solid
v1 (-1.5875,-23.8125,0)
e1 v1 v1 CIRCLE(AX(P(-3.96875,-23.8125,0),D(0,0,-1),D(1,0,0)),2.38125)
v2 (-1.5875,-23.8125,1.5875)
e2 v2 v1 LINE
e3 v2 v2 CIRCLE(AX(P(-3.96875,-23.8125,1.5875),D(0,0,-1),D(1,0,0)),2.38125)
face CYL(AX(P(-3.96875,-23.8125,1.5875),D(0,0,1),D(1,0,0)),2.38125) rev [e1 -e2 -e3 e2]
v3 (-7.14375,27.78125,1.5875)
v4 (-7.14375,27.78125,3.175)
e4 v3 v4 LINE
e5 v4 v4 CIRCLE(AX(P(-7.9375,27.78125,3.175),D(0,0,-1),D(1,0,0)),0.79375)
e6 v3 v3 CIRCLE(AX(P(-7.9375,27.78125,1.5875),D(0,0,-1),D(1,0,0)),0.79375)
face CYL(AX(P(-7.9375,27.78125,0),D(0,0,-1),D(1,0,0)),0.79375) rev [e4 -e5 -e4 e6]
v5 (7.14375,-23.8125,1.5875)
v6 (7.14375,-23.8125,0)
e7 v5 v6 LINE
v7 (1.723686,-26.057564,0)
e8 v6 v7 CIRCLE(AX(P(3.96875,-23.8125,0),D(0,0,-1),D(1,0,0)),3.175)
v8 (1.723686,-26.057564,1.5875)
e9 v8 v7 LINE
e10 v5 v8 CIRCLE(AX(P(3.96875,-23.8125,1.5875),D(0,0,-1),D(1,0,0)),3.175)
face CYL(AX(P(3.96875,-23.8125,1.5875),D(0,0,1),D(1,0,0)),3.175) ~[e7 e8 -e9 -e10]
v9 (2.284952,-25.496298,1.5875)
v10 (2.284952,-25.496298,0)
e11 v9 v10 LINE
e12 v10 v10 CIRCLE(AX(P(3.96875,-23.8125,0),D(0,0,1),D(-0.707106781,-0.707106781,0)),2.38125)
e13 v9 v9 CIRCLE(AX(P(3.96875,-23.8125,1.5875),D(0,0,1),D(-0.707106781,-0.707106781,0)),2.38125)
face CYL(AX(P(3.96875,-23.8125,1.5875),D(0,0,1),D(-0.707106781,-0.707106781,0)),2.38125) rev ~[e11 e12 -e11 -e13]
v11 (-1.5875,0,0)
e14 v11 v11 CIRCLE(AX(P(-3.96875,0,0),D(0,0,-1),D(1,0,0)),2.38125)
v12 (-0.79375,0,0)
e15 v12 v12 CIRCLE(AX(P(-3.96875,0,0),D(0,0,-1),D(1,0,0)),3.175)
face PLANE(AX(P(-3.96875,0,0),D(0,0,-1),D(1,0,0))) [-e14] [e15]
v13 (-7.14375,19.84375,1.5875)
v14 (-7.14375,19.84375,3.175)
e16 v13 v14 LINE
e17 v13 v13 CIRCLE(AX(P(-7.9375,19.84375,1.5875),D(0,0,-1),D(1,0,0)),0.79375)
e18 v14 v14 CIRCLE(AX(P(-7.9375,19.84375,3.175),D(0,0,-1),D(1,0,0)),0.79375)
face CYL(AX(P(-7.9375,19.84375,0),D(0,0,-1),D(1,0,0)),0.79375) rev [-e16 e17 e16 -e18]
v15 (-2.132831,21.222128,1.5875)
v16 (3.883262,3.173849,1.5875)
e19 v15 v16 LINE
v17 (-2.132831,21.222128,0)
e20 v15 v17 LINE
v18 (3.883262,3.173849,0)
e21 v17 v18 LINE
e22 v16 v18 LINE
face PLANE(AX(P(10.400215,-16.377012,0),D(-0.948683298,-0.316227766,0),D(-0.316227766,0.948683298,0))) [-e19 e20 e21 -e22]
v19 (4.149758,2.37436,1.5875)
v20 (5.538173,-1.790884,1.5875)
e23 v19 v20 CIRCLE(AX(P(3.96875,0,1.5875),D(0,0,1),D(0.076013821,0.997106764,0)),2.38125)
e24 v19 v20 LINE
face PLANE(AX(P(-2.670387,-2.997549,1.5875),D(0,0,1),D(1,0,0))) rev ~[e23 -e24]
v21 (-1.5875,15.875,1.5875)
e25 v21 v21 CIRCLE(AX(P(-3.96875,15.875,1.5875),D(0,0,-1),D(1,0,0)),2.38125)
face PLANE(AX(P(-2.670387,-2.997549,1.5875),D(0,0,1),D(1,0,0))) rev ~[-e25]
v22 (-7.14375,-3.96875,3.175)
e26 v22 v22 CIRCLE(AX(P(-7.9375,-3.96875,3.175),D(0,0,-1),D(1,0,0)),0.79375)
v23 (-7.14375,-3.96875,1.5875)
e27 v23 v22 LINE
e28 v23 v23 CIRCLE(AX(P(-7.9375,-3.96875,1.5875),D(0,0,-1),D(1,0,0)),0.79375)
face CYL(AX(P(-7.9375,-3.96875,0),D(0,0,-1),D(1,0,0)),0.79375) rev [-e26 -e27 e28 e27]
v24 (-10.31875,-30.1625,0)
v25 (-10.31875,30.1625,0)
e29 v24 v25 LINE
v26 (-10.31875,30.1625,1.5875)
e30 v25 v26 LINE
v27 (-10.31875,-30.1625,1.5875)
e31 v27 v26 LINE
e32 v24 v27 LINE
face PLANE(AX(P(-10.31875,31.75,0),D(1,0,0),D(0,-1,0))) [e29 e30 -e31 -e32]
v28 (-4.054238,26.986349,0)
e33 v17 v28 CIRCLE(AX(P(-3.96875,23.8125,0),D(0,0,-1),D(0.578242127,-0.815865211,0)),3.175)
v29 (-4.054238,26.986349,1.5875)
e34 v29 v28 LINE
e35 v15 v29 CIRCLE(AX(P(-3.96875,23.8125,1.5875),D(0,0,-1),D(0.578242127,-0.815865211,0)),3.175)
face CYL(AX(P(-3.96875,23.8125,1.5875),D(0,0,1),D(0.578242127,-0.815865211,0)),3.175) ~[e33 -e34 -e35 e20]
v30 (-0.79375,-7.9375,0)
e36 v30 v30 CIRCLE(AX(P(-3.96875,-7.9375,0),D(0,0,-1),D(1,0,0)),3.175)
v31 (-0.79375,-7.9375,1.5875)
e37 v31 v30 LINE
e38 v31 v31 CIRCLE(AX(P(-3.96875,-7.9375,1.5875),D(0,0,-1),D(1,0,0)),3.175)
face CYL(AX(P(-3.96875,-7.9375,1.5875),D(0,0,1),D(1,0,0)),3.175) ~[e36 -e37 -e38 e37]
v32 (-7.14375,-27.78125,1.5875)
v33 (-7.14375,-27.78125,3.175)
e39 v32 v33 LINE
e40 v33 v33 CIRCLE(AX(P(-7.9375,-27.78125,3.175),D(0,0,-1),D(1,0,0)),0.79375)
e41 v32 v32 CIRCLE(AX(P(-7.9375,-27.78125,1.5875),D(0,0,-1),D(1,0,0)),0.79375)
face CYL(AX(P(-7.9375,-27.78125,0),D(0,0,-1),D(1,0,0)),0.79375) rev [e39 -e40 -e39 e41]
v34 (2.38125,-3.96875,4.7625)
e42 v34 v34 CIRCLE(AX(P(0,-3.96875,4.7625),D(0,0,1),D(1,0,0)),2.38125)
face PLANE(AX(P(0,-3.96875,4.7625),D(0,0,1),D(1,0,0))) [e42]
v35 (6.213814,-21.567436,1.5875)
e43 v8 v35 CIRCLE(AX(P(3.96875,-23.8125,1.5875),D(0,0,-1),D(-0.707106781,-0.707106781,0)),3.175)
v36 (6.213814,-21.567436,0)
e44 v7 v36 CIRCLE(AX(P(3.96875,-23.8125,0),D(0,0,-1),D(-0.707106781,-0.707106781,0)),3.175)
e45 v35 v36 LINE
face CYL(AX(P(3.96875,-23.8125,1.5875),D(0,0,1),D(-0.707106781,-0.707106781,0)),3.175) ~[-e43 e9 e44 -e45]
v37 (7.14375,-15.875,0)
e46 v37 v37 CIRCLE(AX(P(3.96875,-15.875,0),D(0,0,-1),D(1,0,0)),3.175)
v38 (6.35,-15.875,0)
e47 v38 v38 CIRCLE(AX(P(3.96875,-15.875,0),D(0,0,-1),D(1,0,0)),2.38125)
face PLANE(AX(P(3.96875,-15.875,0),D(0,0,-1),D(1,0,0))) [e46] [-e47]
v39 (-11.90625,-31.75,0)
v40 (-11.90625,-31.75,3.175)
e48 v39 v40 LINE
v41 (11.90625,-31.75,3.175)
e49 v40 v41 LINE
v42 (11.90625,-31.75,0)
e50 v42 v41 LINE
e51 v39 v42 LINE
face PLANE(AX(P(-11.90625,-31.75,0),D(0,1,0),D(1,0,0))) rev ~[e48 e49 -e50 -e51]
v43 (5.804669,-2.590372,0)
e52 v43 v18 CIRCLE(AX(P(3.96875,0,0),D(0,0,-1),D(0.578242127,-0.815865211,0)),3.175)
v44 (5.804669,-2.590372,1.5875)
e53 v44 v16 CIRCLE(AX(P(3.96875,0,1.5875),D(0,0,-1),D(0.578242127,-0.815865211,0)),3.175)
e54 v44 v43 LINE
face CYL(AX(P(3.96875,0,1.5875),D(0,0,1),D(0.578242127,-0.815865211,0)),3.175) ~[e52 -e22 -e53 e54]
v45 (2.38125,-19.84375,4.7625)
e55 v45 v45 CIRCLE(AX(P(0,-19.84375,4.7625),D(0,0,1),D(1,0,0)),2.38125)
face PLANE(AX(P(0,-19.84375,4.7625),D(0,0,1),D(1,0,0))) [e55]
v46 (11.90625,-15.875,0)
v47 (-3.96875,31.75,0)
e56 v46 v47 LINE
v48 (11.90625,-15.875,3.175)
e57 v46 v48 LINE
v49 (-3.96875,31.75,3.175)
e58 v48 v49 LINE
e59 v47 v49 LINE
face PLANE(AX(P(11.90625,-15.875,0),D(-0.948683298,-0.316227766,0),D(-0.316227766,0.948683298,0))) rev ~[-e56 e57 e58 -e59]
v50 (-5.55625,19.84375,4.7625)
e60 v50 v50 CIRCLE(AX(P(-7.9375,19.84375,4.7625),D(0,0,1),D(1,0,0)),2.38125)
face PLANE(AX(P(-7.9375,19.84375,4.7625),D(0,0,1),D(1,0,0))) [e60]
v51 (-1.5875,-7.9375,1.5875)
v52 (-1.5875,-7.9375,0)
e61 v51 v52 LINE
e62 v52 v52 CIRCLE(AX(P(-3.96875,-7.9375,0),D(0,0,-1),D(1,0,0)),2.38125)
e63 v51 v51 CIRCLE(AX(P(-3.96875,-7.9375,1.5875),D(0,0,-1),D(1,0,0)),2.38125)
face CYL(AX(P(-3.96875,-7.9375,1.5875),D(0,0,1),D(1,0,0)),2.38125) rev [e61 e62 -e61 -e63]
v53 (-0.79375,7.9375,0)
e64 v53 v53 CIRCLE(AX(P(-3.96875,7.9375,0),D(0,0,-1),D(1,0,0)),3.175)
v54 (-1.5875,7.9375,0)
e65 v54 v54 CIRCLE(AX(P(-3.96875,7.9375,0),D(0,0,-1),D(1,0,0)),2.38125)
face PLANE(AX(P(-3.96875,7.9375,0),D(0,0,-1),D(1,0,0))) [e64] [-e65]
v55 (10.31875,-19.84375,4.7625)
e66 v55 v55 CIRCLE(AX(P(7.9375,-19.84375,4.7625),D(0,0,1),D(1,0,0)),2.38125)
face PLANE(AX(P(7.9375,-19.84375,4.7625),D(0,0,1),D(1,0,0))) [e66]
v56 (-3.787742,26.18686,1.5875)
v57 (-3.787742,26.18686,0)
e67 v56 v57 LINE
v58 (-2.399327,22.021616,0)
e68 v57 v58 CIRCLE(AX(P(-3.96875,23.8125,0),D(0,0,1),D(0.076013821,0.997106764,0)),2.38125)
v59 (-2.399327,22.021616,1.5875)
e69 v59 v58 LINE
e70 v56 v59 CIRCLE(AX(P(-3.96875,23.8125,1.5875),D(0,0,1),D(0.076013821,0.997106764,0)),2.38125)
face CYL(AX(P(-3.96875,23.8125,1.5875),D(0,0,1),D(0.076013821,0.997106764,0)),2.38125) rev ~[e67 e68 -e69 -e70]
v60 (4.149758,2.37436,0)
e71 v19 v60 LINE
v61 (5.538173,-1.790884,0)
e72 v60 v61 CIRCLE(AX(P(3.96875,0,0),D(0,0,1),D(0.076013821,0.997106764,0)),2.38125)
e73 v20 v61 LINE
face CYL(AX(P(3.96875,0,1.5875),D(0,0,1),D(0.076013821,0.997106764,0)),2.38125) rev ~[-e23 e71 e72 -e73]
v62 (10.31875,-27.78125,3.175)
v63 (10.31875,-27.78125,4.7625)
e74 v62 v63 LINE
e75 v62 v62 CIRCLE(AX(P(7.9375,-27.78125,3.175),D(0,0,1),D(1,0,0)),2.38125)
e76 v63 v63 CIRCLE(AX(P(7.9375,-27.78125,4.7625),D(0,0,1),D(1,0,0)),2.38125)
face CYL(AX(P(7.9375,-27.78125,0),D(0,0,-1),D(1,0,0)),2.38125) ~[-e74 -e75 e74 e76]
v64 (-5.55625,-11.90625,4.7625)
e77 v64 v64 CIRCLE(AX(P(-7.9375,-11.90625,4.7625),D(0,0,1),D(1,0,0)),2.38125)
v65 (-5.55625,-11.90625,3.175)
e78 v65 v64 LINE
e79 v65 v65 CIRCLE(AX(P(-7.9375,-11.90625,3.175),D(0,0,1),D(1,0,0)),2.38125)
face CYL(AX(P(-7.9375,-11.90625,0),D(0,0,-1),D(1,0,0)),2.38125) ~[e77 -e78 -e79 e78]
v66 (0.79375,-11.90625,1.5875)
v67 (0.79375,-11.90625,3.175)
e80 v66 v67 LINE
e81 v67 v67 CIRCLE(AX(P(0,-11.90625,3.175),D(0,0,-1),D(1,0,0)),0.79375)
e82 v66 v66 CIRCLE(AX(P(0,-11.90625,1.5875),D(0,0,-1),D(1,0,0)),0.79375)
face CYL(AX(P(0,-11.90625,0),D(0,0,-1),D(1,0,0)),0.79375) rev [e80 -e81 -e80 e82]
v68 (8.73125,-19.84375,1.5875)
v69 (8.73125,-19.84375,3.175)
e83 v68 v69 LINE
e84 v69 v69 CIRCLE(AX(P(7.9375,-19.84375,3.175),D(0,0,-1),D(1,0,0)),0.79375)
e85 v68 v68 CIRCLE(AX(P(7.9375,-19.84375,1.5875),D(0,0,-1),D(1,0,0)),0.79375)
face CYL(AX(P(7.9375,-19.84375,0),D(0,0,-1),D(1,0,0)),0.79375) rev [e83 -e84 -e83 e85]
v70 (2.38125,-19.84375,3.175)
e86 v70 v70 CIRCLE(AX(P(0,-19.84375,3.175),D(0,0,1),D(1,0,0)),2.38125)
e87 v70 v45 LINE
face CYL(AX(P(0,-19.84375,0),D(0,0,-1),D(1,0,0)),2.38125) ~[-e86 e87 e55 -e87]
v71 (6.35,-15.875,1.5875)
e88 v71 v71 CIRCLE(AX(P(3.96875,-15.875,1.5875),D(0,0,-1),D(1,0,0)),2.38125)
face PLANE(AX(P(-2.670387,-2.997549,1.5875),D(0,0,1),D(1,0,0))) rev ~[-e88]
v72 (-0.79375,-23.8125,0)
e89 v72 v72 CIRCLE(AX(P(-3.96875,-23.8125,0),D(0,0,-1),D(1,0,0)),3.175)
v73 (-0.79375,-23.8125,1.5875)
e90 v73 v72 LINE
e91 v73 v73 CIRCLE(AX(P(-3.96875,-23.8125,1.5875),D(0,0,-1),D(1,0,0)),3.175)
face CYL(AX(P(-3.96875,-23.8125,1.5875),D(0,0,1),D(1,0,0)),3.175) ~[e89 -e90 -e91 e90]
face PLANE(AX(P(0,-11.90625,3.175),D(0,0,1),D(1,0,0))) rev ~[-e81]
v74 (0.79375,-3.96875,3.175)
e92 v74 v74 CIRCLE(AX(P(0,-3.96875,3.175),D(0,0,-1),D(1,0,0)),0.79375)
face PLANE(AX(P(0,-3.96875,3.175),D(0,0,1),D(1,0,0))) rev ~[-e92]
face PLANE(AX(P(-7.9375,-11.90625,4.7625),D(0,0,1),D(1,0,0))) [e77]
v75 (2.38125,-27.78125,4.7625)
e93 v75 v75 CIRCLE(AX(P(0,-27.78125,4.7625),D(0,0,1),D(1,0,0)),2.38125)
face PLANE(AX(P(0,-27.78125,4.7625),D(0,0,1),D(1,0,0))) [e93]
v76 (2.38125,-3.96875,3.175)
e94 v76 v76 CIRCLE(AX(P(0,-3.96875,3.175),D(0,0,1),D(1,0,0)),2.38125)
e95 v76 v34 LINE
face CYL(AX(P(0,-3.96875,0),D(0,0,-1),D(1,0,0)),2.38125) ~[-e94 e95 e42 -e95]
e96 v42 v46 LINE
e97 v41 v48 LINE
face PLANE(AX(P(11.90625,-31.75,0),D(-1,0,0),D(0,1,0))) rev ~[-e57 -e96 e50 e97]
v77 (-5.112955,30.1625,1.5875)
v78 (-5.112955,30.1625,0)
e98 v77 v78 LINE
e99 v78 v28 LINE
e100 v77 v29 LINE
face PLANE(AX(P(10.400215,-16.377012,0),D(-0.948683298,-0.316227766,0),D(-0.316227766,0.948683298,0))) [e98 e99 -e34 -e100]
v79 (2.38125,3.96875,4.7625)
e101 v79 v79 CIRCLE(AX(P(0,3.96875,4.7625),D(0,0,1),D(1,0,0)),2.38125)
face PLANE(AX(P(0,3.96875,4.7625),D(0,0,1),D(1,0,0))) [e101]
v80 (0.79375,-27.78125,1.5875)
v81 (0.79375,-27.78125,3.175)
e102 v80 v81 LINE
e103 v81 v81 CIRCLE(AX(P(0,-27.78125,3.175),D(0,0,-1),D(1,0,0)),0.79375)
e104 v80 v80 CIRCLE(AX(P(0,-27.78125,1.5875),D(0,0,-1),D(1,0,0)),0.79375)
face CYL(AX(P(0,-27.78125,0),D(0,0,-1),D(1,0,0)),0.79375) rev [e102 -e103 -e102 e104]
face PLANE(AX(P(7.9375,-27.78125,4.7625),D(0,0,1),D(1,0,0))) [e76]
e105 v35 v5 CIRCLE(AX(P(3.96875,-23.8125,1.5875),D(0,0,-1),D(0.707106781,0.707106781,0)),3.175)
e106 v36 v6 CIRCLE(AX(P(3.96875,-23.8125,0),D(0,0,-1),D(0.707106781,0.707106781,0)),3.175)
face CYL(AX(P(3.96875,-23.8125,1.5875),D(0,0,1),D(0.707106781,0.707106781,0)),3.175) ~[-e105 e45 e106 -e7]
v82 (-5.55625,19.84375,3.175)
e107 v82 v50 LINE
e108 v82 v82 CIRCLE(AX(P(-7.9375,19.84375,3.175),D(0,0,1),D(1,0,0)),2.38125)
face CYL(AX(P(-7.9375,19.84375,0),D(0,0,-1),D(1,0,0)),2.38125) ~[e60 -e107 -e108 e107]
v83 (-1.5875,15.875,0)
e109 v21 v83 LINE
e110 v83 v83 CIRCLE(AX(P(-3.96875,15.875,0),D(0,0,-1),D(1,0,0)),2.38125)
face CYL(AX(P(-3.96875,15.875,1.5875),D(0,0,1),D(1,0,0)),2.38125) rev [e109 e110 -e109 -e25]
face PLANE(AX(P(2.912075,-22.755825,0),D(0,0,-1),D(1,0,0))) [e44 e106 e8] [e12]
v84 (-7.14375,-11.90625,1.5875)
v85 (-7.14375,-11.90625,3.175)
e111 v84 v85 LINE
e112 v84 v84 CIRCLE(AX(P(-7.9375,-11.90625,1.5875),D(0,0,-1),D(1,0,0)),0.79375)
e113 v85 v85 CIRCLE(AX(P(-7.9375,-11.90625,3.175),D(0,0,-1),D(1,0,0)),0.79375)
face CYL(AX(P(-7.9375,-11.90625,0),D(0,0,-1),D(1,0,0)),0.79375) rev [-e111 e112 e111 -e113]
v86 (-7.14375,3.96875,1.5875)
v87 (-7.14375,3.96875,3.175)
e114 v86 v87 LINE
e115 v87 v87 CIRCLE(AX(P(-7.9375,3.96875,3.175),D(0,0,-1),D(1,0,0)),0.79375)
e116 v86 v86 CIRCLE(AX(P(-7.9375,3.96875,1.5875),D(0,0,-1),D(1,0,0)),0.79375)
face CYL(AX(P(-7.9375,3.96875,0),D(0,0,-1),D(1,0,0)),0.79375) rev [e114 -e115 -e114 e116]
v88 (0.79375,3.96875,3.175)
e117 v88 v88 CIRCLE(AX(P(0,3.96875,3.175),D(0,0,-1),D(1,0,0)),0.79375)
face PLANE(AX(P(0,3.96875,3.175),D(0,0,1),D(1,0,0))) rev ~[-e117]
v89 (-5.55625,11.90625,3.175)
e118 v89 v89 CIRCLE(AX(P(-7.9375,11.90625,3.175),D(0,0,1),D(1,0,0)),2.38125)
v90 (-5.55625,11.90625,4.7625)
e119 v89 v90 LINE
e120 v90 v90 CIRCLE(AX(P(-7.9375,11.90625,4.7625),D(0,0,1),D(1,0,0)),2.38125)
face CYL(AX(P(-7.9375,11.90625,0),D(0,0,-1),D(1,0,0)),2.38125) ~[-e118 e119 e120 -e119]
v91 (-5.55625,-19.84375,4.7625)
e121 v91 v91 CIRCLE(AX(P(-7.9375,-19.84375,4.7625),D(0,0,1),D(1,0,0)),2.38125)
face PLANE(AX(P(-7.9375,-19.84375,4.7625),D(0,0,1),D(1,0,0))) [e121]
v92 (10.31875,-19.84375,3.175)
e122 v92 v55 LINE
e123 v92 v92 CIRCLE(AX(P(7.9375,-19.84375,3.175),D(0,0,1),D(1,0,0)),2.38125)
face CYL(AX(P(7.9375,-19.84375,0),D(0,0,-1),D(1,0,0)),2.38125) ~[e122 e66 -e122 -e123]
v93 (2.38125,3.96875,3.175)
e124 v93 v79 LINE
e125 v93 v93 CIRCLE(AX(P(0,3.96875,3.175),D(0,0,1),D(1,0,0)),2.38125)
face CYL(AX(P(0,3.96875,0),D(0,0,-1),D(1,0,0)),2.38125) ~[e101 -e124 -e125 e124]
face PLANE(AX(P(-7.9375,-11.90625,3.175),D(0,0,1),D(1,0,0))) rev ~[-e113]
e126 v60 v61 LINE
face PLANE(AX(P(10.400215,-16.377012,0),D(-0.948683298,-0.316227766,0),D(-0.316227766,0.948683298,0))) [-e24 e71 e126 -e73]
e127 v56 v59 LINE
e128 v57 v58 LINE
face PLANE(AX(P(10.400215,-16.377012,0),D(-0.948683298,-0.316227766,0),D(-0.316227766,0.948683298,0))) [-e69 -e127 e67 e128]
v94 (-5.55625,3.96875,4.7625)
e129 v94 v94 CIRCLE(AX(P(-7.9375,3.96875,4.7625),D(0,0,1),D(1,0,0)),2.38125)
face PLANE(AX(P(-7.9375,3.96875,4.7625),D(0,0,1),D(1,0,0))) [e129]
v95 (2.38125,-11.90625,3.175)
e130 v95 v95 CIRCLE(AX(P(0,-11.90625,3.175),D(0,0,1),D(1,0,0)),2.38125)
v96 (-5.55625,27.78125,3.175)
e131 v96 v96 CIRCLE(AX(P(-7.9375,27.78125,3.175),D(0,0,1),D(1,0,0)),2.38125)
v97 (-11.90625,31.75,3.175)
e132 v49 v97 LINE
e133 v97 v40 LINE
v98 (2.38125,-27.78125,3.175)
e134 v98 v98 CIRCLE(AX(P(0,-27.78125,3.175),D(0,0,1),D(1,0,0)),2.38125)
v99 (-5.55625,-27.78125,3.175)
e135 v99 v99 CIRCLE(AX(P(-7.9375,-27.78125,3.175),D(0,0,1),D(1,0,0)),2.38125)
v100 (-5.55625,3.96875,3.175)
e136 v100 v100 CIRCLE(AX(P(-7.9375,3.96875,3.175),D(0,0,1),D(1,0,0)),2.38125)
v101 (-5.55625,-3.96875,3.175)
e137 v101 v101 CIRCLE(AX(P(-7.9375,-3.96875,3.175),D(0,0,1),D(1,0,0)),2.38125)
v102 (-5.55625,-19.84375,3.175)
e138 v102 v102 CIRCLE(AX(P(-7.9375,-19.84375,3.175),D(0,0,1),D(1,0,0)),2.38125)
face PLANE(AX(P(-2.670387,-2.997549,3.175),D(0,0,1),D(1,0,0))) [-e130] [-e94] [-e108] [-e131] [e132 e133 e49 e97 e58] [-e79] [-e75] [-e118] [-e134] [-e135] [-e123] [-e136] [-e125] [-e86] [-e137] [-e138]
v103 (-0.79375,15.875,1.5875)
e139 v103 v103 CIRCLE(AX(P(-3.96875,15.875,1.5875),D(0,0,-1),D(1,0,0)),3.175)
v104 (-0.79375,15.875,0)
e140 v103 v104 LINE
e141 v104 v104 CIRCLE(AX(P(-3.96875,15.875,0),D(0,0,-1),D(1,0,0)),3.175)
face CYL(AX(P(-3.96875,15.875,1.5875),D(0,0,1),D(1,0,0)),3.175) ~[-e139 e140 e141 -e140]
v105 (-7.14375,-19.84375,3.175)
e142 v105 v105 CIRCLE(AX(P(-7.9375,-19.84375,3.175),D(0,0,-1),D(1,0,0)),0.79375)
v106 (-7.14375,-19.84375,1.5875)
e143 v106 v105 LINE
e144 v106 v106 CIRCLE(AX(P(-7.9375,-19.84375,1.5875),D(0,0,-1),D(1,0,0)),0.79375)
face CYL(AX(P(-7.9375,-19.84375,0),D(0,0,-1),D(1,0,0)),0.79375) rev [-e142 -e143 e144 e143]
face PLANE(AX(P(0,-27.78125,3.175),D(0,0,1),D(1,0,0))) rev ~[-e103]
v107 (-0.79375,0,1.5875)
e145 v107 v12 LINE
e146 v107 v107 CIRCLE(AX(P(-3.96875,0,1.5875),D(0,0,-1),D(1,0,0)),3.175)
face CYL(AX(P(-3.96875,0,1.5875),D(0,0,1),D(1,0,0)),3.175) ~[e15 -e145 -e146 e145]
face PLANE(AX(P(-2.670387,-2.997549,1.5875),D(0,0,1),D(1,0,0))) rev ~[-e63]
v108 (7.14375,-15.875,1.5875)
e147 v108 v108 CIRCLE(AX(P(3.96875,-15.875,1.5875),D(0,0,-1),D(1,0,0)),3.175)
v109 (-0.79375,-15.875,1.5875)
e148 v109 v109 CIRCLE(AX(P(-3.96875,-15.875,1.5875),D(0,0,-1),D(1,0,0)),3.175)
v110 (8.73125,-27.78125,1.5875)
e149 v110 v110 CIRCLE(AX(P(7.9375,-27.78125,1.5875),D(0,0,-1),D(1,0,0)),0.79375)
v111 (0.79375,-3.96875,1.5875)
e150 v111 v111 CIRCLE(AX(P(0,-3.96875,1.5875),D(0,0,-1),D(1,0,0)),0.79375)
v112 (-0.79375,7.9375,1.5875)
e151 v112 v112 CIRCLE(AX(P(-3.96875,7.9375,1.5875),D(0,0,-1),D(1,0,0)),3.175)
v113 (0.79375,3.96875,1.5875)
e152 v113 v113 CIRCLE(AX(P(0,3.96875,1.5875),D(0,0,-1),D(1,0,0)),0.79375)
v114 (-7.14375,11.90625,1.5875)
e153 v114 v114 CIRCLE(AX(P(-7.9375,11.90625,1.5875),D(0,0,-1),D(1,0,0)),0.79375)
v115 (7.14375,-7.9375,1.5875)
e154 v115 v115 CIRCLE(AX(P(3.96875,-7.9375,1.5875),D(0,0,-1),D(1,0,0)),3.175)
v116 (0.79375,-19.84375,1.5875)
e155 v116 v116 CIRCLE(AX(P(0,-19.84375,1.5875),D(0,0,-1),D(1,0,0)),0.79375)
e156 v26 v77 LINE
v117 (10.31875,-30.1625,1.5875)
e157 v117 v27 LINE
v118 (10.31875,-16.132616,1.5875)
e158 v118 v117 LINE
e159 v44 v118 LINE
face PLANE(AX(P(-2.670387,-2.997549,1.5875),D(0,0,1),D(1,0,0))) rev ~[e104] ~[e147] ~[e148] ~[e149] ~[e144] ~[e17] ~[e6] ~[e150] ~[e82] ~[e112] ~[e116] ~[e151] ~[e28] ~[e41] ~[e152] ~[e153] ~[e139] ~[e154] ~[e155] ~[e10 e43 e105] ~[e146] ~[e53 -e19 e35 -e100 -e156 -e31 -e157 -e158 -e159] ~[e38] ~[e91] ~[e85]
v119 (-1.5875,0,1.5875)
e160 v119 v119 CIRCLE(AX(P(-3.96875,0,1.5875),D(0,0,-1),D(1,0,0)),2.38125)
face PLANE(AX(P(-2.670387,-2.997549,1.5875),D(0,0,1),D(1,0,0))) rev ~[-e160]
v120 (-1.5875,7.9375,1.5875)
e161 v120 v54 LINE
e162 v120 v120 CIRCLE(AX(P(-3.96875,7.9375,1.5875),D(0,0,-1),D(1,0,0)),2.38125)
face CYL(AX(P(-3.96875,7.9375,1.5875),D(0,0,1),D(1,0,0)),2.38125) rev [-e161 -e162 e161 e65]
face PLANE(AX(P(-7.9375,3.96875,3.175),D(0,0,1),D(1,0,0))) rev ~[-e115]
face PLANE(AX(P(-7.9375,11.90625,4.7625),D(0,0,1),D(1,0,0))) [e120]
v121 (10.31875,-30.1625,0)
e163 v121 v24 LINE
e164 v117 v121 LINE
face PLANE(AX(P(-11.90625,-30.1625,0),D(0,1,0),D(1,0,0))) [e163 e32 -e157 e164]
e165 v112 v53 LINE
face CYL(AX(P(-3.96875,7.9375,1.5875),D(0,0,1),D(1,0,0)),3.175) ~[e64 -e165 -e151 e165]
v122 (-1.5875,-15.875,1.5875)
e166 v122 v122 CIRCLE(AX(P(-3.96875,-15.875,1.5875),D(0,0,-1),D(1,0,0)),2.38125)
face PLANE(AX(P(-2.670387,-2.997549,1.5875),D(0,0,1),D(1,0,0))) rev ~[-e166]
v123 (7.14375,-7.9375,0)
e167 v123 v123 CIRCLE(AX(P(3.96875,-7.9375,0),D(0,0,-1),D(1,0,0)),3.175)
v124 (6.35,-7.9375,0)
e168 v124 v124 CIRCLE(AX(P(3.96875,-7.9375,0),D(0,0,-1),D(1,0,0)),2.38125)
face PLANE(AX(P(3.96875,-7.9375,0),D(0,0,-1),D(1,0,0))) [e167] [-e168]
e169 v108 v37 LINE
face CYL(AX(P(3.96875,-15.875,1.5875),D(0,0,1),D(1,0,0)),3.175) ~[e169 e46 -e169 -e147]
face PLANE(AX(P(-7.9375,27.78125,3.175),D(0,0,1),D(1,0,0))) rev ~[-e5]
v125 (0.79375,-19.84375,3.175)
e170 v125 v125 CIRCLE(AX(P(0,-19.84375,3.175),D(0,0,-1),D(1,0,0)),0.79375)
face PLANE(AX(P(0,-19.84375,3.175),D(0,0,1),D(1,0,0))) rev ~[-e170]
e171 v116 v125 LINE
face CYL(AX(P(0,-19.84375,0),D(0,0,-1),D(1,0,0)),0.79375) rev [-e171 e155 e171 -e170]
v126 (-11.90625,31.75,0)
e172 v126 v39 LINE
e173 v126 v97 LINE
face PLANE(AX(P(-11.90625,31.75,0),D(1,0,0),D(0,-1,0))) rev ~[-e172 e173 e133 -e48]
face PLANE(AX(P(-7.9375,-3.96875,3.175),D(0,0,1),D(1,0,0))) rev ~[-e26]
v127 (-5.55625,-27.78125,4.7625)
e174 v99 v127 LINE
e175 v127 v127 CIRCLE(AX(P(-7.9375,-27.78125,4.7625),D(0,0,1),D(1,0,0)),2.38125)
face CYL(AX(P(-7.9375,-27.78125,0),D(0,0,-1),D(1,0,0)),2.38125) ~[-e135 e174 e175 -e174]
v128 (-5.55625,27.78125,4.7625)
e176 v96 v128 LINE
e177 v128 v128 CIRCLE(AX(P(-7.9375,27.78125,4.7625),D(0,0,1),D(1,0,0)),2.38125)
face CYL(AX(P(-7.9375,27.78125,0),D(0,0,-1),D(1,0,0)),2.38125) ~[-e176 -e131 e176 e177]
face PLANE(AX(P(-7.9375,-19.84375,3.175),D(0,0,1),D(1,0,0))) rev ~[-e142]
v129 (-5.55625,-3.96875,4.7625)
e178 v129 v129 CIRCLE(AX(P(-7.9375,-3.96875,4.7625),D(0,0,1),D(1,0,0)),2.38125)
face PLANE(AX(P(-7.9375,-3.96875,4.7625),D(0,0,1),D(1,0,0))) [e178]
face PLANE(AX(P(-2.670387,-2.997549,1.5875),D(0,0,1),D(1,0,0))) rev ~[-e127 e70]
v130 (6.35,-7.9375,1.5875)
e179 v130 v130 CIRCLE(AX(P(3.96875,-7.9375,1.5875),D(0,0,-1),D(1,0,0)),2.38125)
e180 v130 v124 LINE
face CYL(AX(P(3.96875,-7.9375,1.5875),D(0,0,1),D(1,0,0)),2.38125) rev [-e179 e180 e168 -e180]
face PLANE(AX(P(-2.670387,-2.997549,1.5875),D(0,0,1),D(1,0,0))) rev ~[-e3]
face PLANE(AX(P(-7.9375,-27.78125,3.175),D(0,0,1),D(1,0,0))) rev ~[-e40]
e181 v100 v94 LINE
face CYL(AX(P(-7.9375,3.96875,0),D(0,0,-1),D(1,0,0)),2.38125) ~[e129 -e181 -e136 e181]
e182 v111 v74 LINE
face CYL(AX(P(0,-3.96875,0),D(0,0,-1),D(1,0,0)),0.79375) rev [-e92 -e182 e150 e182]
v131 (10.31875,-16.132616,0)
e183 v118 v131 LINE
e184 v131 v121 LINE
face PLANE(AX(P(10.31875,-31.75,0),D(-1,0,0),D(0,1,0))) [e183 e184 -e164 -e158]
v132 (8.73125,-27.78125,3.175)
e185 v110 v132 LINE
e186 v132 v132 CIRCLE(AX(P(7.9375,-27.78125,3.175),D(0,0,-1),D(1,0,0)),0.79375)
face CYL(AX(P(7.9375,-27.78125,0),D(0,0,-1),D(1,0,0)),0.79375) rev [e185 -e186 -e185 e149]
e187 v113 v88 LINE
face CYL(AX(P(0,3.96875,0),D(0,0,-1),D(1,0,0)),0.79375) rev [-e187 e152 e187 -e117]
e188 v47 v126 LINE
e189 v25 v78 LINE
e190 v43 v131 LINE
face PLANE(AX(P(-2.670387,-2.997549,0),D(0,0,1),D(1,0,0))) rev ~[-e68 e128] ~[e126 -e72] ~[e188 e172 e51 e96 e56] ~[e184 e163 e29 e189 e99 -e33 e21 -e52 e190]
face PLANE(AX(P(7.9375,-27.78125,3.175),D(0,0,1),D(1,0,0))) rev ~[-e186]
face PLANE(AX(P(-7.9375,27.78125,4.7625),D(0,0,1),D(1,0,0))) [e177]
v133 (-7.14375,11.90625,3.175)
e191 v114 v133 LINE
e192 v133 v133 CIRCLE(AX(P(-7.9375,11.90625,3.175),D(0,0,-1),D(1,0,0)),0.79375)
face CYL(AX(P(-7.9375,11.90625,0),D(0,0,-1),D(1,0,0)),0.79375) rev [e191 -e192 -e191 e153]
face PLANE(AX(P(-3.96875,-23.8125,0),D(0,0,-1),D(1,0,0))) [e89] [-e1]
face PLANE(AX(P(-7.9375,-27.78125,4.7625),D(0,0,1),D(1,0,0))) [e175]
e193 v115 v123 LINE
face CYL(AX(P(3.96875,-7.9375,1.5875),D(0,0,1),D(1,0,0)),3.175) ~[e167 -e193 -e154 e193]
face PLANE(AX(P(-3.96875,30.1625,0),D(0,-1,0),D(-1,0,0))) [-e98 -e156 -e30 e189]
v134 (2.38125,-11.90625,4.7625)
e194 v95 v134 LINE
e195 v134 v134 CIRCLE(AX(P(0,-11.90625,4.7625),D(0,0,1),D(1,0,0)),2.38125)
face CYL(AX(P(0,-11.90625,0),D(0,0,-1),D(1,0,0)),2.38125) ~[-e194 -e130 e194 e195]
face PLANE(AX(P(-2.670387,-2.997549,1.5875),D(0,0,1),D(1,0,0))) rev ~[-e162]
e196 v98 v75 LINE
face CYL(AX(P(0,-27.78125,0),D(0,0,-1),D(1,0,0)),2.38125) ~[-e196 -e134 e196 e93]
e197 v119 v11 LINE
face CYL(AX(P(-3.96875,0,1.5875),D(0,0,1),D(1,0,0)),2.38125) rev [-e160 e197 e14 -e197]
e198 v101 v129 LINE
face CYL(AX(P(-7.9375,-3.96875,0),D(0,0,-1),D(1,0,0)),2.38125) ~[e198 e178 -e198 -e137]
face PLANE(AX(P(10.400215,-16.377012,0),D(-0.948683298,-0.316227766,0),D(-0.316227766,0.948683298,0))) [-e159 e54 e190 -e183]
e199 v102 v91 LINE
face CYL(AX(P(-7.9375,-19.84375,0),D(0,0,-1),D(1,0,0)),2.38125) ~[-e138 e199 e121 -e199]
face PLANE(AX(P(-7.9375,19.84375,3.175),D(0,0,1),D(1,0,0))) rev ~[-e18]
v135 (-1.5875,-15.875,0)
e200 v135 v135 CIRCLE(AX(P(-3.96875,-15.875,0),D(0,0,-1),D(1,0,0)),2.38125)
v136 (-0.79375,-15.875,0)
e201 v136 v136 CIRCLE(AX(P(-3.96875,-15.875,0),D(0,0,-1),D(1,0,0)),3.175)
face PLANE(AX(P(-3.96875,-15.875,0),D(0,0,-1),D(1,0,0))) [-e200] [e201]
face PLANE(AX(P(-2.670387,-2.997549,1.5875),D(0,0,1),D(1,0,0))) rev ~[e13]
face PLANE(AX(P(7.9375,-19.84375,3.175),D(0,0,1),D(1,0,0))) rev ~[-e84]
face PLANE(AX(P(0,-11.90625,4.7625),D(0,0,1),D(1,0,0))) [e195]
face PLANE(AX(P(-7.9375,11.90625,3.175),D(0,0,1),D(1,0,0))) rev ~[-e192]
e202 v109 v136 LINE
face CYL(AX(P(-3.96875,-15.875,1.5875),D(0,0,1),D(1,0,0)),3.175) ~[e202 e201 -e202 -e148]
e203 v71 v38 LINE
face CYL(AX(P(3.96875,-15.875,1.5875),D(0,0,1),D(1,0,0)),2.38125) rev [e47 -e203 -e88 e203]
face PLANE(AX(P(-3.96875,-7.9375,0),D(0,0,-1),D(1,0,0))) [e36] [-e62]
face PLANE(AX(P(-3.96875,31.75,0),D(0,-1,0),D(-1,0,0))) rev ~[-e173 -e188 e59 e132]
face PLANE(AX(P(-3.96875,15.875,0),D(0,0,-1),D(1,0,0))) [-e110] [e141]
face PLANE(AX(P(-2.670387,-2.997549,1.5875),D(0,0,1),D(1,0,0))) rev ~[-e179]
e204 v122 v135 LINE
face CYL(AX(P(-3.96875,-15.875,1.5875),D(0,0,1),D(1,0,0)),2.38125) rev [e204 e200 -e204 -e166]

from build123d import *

# Parameters (mm, degrees)
F0_R     = 2.38125
F1_DEPTH = 3.175
F2_DEPTH = 4.7625
F3_T     = -1.5875
F4_R     = 3.175
F4_R_2   = 2.38125
F5_DEPTH = 1.5875


with BuildPart() as f1:
    # F0 (on Top) → F1 (new body)
    with BuildSketch(Plane.XY):
        Polygon((-3.96875, 31.75), (-11.90625, 31.75), (-11.90625, -31.75), (11.90625, -31.75), (11.90625, -15.875), align=None)
        with Locations((-7.9375, -27.78125)):
            Circle(F0_R, mode=Mode.SUBTRACT)
        with Locations((-7.9375, -19.84375)):
            Circle(F0_R, mode=Mode.SUBTRACT)
        with Locations((-7.9375, -11.90625)):
            Circle(F0_R, mode=Mode.SUBTRACT)
        with Locations((-7.9375, -3.96875)):
            Circle(F0_R, mode=Mode.SUBTRACT)
        with Locations((0, -27.78125)):
            Circle(F0_R, mode=Mode.SUBTRACT)
        with Locations((0, -19.84375)):
            Circle(F0_R, mode=Mode.SUBTRACT)
        with Locations((7.9375, -27.78125)):
            Circle(F0_R, mode=Mode.SUBTRACT)
        with Locations((7.9375, -19.84375)):
            Circle(F0_R, mode=Mode.SUBTRACT)
        with Locations((0, -11.90625)):
            Circle(F0_R, mode=Mode.SUBTRACT)
        with Locations((0, -3.96875)):
            Circle(F0_R, mode=Mode.SUBTRACT)
        with Locations((-7.9375, 3.96875)):
            Circle(F0_R, mode=Mode.SUBTRACT)
        with Locations((-7.9375, 11.90625)):
            Circle(F0_R, mode=Mode.SUBTRACT)
        with Locations((-7.9375, 19.84375)):
            Circle(F0_R, mode=Mode.SUBTRACT)
        with Locations((-7.9375, 27.78125)):
            Circle(F0_R, mode=Mode.SUBTRACT)
        with Locations((0, 3.96875)):
            Circle(F0_R, mode=Mode.SUBTRACT)
    extrude(amount=F1_DEPTH)

    # F0 (on Top) → F2 (join)
    with BuildSketch(Plane.XY):
        with Locations((-7.9375, 27.78125)):
            Circle(F0_R)
        with Locations((-7.9375, 19.84375)):
            Circle(F0_R)
        with Locations((-7.9375, 11.90625)):
            Circle(F0_R)
        with Locations((-7.9375, 3.96875)):
            Circle(F0_R)
        with Locations((-7.9375, -3.96875)):
            Circle(F0_R)
        with Locations((-7.9375, -11.90625)):
            Circle(F0_R)
        with Locations((-7.9375, -19.84375)):
            Circle(F0_R)
        with Locations((-7.9375, -27.78125)):
            Circle(F0_R)
        with Locations((0, -27.78125)):
            Circle(F0_R)
        with Locations((0, -19.84375)):
            Circle(F0_R)
        with Locations((0, -11.90625)):
            Circle(F0_R)
        with Locations((0, -3.96875)):
            Circle(F0_R)
        with Locations((0, 3.96875)):
            Circle(F0_R)
        with Locations((7.9375, -19.84375)):
            Circle(F0_R)
        with Locations((7.9375, -27.78125)):
            Circle(F0_R)
    extrude(amount=F2_DEPTH)

    # F3
    f3_openings = [f1.faces().sort_by_distance(p)[0] for p in [
        (-2.204861, -5.291667, 0),
    ]]
    offset(amount=F3_T, openings=f3_openings, kind=Kind.INTERSECTION)

    # F4 (on face) → F5 (join)
    with BuildSketch(Plane(origin=(0, 0, 1.5875), x_dir=(1, 0, 0), z_dir=(0, 0, -1))):
        with BuildLine():
            ThreePointArc((1.7236859697, 26.0575640303), (1.7236859697, 21.5674359697), (6.2138140303, 21.5674359697))
            Line((6.2138140303, 21.5674359697), (5.6525480227, 22.1287019773))
            ThreePointArc((5.6525480227, 22.1287019773), (2.2849519773, 22.1287019773), (2.2849519773, 25.4962980227))
            Line((2.2849519773, 25.4962980227), (1.7236859697, 26.0575640303))
        make_face()
        with BuildLine():
            Line((5.6525480227, 22.1287019773), (6.2138140303, 21.5674359697))
            ThreePointArc((6.2138140303, 21.5674359697), (6.9020675157, 22.5974801022), (7.14375, 23.8125))
            ThreePointArc((7.14375, 23.8125), (5.1837698978, 26.7458175157), (1.7236859697, 26.0575640303))
            Line((1.7236859697, 26.0575640303), (2.2849519773, 25.4962980227))
            ThreePointArc((2.2849519773, 25.4962980227), (4.8800149233, 26.0124881368), (6.35, 23.8125))
            ThreePointArc((6.35, 23.8125), (6.1687381368, 22.9012350767), (5.6525480227, 22.1287019773))
        make_face()
        with Locations((3.96875, 15.875)):
            Circle(F4_R)
        with Locations((3.96875, 15.875)):
            Circle(F4_R_2, mode=Mode.SUBTRACT)
        with Locations((3.96875, 7.9375)):
            Circle(F4_R)
        with Locations((3.96875, 7.9375)):
            Circle(F4_R_2, mode=Mode.SUBTRACT)
        with BuildLine():
            Line((5.5381726179, 1.7908836392), (5.8046687532, 2.590372045))
            ThreePointArc((5.8046687532, 2.590372045), (0.9566805287, 1.0040231571), (3.8832617755, -3.1738488879))
            Line((3.8832617755, -3.1738488879), (4.1497579108, -2.3743604821))
            ThreePointArc((4.1497579108, -2.3743604821), (1.7096978965, 0.7530173678), (5.5381726179, 1.7908836392))
        make_face()
        with BuildLine():
            Line((-2.3993273821, -22.0216163608), (-2.1328312468, -21.222127955))
            ThreePointArc((-2.1328312468, -21.222127955), (-6.9808194713, -22.8084768429), (-4.0542382245, -26.9863488879))
            Line((-4.0542382245, -26.9863488879), (-3.7877420892, -26.1868604821))
            ThreePointArc((-3.7877420892, -26.1868604821), (-6.2278021035, -23.0594826322), (-2.3993273821, -22.0216163608))
        make_face()
        with Locations((-3.96875, 23.8125)):
            Circle(F4_R)
        with Locations((-3.96875, 23.8125)):
            Circle(F4_R_2, mode=Mode.SUBTRACT)
        with Locations((-3.96875, 15.875)):
            Circle(F4_R)
        with Locations((-3.96875, 15.875)):
            Circle(F4_R_2, mode=Mode.SUBTRACT)
        with Locations((-3.96875, 7.9375)):
            Circle(F4_R)
        with Locations((-3.96875, 7.9375)):
            Circle(F4_R_2, mode=Mode.SUBTRACT)
        with Locations((-3.96875, 0)):
            Circle(F4_R)
        with Locations((-3.96875, 0)):
            Circle(F4_R_2, mode=Mode.SUBTRACT)
        with Locations((-3.96875, -7.9375)):
            Circle(F4_R)
        with Locations((-3.96875, -7.9375)):
            Circle(F4_R_2, mode=Mode.SUBTRACT)
        with Locations((-3.96875, -15.875)):
            Circle(F4_R)
        with Locations((-3.96875, -15.875)):
            Circle(F4_R_2, mode=Mode.SUBTRACT)
    extrude(amount=F5_DEPTH)


solid = f1.part
